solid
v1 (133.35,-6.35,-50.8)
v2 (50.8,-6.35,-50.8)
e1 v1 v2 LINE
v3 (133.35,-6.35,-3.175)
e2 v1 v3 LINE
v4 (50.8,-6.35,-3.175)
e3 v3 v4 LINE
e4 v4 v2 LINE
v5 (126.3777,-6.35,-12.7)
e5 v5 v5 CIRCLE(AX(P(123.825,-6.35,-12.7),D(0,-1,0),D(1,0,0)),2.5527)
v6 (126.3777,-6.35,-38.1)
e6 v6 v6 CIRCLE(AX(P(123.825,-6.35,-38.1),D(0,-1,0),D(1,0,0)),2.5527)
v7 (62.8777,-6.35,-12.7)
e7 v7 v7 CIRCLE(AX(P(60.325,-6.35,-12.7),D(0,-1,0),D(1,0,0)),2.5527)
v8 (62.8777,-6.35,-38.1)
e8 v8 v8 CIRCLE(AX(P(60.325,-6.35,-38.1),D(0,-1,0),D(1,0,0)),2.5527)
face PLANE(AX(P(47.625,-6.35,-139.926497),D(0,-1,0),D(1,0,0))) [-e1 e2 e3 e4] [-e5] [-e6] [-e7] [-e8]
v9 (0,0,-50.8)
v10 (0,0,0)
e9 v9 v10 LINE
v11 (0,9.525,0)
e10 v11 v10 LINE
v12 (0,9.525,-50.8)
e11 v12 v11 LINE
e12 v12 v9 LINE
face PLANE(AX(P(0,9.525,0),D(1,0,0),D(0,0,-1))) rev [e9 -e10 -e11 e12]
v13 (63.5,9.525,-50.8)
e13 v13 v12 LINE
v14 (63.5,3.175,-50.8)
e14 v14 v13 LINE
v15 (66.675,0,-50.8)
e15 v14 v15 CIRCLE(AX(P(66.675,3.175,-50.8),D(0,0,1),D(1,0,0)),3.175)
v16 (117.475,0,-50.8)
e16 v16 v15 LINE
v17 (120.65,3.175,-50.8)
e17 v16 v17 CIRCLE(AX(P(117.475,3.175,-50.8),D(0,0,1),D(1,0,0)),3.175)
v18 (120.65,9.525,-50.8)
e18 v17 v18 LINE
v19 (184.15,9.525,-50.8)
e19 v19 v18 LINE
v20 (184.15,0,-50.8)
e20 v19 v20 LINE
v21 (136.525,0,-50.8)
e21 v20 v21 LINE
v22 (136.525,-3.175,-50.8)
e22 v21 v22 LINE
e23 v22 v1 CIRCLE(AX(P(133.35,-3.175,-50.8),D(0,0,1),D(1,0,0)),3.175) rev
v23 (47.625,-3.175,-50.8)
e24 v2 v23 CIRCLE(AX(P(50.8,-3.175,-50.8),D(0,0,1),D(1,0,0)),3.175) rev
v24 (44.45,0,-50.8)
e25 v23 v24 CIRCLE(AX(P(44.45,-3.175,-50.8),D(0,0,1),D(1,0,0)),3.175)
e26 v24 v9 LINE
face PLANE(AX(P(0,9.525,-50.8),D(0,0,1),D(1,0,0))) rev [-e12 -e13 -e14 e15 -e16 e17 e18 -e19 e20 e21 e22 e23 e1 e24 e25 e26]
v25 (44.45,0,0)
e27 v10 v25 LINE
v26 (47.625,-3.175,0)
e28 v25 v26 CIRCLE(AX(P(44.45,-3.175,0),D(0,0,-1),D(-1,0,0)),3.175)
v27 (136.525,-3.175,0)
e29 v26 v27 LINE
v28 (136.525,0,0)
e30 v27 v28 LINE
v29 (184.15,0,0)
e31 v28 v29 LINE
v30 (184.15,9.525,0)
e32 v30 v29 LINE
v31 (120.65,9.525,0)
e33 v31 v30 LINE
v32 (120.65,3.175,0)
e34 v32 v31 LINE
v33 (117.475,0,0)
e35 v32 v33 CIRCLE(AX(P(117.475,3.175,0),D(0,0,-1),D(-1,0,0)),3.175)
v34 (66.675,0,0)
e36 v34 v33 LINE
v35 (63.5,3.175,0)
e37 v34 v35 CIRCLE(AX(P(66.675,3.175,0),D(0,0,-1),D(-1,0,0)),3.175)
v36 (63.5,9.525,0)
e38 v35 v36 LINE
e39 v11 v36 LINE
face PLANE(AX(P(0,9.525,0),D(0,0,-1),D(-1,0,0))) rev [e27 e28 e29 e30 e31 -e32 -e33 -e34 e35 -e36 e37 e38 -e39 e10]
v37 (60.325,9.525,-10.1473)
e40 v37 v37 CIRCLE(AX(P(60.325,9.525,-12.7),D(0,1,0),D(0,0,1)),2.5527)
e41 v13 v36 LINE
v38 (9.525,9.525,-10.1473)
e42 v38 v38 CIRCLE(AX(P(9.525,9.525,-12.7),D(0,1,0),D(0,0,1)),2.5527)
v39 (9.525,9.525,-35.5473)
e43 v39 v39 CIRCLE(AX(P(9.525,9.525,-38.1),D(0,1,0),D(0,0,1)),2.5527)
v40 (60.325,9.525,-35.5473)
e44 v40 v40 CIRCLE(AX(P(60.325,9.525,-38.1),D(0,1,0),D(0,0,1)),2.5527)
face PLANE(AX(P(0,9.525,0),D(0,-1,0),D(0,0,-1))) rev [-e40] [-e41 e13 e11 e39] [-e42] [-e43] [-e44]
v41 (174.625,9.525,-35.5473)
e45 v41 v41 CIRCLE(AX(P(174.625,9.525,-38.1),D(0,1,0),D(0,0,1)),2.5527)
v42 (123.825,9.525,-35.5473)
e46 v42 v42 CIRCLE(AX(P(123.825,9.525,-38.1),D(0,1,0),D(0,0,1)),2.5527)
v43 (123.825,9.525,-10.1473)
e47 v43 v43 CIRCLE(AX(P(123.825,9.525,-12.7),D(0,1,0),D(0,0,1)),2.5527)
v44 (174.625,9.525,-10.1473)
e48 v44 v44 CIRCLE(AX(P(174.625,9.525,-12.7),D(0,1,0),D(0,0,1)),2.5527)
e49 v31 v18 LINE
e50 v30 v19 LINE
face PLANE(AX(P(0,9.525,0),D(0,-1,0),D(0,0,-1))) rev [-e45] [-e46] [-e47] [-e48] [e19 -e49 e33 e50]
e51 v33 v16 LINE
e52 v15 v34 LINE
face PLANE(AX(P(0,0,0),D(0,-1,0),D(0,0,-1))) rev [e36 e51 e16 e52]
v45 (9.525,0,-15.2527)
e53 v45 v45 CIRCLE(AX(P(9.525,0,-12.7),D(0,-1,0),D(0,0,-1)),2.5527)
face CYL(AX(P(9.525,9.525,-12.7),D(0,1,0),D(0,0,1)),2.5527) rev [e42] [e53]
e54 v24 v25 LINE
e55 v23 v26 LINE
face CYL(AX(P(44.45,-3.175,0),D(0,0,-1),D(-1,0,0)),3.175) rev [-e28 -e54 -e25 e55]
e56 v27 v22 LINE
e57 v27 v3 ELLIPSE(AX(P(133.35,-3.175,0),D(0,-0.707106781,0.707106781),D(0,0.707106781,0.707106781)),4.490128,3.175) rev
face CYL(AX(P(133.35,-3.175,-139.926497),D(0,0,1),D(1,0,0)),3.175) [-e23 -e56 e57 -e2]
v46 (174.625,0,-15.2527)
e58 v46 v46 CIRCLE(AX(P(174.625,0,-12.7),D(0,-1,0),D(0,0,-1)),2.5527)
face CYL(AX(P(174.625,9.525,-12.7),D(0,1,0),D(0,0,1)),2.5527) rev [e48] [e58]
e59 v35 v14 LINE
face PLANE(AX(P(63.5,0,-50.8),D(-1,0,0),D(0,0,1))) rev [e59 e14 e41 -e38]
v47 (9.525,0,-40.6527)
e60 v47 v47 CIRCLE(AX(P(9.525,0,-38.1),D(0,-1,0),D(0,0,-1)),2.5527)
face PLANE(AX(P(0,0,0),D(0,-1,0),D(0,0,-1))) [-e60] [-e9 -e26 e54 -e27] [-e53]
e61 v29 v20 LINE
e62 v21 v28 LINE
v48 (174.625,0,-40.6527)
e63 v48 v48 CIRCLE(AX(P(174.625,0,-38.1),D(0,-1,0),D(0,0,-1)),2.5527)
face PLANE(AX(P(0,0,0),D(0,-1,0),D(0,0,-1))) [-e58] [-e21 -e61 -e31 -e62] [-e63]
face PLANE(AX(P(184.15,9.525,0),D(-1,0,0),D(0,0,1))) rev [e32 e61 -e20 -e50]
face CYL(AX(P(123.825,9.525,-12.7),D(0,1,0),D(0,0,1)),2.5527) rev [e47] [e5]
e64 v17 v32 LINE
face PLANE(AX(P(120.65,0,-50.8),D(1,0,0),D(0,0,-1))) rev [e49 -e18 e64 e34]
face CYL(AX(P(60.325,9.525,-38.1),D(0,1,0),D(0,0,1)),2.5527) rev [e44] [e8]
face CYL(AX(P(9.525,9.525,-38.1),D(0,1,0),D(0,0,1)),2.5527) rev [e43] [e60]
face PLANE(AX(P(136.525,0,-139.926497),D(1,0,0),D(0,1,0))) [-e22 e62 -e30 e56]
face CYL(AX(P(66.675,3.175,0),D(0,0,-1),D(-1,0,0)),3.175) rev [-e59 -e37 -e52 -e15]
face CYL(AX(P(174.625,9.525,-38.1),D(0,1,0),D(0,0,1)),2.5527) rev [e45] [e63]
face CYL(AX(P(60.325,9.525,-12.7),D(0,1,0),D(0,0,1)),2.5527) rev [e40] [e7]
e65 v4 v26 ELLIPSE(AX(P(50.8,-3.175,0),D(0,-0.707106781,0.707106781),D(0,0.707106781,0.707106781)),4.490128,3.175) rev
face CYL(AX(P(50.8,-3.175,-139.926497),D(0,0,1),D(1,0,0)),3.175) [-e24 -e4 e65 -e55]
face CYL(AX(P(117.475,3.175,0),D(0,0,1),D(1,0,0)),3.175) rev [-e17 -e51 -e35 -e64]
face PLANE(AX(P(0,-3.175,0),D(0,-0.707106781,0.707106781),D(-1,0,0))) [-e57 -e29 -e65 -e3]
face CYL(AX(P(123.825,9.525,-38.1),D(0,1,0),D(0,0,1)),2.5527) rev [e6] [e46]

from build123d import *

# Parameters (mm, degrees)
SKETCH1_W              = 184.15
SKETCH1_H              = 50.8
BOSS_EXTRUDE1_DEPTH    = 9.525
SKETCH4_W              = 88.9
SKETCH4_H              = 6.35
BOSS_EXTRUDE2_DEPTH    = 50.8
SKETCH5_W              = 57.15
SKETCH5_H              = 50.8
CUT_EXTRUDE1_DEPTH     = 9.525
F_10_CLEARANCE_HOLE1_D = 5.1054
FILLET1_R              = 3.175
CHAMFER1_SIZE          = 3.175


# Some blends are built 0.0001 mm under size
with BuildPart() as part:
    # Sketch1 → Boss-Extrude1 (new body)
    with BuildSketch(Plane(origin=(0, 0, 0), x_dir=(1, 0, 0), z_dir=(0, 1, 0))):
        with Locations((92.075, 25.4)):
            Rectangle(SKETCH1_W, SKETCH1_H)
    extrude(amount=BOSS_EXTRUDE1_DEPTH)

    # Sketch4 → Boss-Extrude2 (add)
    with BuildSketch(Plane.XY):
        with Locations((92.075, -3.175)):
            Rectangle(SKETCH4_W, SKETCH4_H)
    extrude(amount=-BOSS_EXTRUDE2_DEPTH)

    # Sketch5 → Cut-Extrude1 (cut)
    with BuildSketch(Plane(origin=(0, 9.525, 0), x_dir=(1, 0, 0), z_dir=(0, 1, 0))):
        with Locations((92.075, 25.4)):
            Rectangle(SKETCH5_W, SKETCH5_H)
    extrude(amount=-CUT_EXTRUDE1_DEPTH, mode=Mode.SUBTRACT)

    # #10 Clearance Hole1 (through all)
    with Locations(Plane(origin=(0, 9.525, 0), x_dir=(1, 0, 0), z_dir=(0, 1, 0))):
        with Locations((9.525, 38.1), (9.525, 12.7), (60.325, 12.7), (60.325, 38.1), (123.825, 38.1), (123.825, 12.7), (174.625, 12.7), (174.625, 38.1)):
            Hole(F_10_CLEARANCE_HOLE1_D / 2)

    # Fillet1
    fillet1_edges = [part.edges().sort_by_distance(p)[0] for p in [
        (47.625, 0, -25.4),
        (47.625, -6.35, -25.4),
        (136.525, -6.35, -25.4),
        (63.5, 0, -25.4),
        (120.65, 0, -25.4),
    ]]
    fillet(fillet1_edges, radius=FILLET1_R - 0.0001)  # a hair under: the kernel refuses the full size

    # Chamfer1
    # the kernel refuses this chamfer: 3.175 mm, written as the material it takes off along each edge
    with BuildSketch(Plane(origin=(141.515193487, -6.35, 0), x_dir=(0, 0.9996219169112966, 0.02749587661058637), z_dir=(-1, 0, 0))) as chamfer1_piece_1:
        Polygon((CHAMFER1_SIZE * 0.999621916911, CHAMFER1_SIZE * 0.0274958766106), (-CHAMFER1_SIZE * 0.0274958766106, CHAMFER1_SIZE * 0.999621916911), (0, 0), align=None)
    extrude(amount=98.880386974, mode=Mode.SUBTRACT)


solid = part.part
